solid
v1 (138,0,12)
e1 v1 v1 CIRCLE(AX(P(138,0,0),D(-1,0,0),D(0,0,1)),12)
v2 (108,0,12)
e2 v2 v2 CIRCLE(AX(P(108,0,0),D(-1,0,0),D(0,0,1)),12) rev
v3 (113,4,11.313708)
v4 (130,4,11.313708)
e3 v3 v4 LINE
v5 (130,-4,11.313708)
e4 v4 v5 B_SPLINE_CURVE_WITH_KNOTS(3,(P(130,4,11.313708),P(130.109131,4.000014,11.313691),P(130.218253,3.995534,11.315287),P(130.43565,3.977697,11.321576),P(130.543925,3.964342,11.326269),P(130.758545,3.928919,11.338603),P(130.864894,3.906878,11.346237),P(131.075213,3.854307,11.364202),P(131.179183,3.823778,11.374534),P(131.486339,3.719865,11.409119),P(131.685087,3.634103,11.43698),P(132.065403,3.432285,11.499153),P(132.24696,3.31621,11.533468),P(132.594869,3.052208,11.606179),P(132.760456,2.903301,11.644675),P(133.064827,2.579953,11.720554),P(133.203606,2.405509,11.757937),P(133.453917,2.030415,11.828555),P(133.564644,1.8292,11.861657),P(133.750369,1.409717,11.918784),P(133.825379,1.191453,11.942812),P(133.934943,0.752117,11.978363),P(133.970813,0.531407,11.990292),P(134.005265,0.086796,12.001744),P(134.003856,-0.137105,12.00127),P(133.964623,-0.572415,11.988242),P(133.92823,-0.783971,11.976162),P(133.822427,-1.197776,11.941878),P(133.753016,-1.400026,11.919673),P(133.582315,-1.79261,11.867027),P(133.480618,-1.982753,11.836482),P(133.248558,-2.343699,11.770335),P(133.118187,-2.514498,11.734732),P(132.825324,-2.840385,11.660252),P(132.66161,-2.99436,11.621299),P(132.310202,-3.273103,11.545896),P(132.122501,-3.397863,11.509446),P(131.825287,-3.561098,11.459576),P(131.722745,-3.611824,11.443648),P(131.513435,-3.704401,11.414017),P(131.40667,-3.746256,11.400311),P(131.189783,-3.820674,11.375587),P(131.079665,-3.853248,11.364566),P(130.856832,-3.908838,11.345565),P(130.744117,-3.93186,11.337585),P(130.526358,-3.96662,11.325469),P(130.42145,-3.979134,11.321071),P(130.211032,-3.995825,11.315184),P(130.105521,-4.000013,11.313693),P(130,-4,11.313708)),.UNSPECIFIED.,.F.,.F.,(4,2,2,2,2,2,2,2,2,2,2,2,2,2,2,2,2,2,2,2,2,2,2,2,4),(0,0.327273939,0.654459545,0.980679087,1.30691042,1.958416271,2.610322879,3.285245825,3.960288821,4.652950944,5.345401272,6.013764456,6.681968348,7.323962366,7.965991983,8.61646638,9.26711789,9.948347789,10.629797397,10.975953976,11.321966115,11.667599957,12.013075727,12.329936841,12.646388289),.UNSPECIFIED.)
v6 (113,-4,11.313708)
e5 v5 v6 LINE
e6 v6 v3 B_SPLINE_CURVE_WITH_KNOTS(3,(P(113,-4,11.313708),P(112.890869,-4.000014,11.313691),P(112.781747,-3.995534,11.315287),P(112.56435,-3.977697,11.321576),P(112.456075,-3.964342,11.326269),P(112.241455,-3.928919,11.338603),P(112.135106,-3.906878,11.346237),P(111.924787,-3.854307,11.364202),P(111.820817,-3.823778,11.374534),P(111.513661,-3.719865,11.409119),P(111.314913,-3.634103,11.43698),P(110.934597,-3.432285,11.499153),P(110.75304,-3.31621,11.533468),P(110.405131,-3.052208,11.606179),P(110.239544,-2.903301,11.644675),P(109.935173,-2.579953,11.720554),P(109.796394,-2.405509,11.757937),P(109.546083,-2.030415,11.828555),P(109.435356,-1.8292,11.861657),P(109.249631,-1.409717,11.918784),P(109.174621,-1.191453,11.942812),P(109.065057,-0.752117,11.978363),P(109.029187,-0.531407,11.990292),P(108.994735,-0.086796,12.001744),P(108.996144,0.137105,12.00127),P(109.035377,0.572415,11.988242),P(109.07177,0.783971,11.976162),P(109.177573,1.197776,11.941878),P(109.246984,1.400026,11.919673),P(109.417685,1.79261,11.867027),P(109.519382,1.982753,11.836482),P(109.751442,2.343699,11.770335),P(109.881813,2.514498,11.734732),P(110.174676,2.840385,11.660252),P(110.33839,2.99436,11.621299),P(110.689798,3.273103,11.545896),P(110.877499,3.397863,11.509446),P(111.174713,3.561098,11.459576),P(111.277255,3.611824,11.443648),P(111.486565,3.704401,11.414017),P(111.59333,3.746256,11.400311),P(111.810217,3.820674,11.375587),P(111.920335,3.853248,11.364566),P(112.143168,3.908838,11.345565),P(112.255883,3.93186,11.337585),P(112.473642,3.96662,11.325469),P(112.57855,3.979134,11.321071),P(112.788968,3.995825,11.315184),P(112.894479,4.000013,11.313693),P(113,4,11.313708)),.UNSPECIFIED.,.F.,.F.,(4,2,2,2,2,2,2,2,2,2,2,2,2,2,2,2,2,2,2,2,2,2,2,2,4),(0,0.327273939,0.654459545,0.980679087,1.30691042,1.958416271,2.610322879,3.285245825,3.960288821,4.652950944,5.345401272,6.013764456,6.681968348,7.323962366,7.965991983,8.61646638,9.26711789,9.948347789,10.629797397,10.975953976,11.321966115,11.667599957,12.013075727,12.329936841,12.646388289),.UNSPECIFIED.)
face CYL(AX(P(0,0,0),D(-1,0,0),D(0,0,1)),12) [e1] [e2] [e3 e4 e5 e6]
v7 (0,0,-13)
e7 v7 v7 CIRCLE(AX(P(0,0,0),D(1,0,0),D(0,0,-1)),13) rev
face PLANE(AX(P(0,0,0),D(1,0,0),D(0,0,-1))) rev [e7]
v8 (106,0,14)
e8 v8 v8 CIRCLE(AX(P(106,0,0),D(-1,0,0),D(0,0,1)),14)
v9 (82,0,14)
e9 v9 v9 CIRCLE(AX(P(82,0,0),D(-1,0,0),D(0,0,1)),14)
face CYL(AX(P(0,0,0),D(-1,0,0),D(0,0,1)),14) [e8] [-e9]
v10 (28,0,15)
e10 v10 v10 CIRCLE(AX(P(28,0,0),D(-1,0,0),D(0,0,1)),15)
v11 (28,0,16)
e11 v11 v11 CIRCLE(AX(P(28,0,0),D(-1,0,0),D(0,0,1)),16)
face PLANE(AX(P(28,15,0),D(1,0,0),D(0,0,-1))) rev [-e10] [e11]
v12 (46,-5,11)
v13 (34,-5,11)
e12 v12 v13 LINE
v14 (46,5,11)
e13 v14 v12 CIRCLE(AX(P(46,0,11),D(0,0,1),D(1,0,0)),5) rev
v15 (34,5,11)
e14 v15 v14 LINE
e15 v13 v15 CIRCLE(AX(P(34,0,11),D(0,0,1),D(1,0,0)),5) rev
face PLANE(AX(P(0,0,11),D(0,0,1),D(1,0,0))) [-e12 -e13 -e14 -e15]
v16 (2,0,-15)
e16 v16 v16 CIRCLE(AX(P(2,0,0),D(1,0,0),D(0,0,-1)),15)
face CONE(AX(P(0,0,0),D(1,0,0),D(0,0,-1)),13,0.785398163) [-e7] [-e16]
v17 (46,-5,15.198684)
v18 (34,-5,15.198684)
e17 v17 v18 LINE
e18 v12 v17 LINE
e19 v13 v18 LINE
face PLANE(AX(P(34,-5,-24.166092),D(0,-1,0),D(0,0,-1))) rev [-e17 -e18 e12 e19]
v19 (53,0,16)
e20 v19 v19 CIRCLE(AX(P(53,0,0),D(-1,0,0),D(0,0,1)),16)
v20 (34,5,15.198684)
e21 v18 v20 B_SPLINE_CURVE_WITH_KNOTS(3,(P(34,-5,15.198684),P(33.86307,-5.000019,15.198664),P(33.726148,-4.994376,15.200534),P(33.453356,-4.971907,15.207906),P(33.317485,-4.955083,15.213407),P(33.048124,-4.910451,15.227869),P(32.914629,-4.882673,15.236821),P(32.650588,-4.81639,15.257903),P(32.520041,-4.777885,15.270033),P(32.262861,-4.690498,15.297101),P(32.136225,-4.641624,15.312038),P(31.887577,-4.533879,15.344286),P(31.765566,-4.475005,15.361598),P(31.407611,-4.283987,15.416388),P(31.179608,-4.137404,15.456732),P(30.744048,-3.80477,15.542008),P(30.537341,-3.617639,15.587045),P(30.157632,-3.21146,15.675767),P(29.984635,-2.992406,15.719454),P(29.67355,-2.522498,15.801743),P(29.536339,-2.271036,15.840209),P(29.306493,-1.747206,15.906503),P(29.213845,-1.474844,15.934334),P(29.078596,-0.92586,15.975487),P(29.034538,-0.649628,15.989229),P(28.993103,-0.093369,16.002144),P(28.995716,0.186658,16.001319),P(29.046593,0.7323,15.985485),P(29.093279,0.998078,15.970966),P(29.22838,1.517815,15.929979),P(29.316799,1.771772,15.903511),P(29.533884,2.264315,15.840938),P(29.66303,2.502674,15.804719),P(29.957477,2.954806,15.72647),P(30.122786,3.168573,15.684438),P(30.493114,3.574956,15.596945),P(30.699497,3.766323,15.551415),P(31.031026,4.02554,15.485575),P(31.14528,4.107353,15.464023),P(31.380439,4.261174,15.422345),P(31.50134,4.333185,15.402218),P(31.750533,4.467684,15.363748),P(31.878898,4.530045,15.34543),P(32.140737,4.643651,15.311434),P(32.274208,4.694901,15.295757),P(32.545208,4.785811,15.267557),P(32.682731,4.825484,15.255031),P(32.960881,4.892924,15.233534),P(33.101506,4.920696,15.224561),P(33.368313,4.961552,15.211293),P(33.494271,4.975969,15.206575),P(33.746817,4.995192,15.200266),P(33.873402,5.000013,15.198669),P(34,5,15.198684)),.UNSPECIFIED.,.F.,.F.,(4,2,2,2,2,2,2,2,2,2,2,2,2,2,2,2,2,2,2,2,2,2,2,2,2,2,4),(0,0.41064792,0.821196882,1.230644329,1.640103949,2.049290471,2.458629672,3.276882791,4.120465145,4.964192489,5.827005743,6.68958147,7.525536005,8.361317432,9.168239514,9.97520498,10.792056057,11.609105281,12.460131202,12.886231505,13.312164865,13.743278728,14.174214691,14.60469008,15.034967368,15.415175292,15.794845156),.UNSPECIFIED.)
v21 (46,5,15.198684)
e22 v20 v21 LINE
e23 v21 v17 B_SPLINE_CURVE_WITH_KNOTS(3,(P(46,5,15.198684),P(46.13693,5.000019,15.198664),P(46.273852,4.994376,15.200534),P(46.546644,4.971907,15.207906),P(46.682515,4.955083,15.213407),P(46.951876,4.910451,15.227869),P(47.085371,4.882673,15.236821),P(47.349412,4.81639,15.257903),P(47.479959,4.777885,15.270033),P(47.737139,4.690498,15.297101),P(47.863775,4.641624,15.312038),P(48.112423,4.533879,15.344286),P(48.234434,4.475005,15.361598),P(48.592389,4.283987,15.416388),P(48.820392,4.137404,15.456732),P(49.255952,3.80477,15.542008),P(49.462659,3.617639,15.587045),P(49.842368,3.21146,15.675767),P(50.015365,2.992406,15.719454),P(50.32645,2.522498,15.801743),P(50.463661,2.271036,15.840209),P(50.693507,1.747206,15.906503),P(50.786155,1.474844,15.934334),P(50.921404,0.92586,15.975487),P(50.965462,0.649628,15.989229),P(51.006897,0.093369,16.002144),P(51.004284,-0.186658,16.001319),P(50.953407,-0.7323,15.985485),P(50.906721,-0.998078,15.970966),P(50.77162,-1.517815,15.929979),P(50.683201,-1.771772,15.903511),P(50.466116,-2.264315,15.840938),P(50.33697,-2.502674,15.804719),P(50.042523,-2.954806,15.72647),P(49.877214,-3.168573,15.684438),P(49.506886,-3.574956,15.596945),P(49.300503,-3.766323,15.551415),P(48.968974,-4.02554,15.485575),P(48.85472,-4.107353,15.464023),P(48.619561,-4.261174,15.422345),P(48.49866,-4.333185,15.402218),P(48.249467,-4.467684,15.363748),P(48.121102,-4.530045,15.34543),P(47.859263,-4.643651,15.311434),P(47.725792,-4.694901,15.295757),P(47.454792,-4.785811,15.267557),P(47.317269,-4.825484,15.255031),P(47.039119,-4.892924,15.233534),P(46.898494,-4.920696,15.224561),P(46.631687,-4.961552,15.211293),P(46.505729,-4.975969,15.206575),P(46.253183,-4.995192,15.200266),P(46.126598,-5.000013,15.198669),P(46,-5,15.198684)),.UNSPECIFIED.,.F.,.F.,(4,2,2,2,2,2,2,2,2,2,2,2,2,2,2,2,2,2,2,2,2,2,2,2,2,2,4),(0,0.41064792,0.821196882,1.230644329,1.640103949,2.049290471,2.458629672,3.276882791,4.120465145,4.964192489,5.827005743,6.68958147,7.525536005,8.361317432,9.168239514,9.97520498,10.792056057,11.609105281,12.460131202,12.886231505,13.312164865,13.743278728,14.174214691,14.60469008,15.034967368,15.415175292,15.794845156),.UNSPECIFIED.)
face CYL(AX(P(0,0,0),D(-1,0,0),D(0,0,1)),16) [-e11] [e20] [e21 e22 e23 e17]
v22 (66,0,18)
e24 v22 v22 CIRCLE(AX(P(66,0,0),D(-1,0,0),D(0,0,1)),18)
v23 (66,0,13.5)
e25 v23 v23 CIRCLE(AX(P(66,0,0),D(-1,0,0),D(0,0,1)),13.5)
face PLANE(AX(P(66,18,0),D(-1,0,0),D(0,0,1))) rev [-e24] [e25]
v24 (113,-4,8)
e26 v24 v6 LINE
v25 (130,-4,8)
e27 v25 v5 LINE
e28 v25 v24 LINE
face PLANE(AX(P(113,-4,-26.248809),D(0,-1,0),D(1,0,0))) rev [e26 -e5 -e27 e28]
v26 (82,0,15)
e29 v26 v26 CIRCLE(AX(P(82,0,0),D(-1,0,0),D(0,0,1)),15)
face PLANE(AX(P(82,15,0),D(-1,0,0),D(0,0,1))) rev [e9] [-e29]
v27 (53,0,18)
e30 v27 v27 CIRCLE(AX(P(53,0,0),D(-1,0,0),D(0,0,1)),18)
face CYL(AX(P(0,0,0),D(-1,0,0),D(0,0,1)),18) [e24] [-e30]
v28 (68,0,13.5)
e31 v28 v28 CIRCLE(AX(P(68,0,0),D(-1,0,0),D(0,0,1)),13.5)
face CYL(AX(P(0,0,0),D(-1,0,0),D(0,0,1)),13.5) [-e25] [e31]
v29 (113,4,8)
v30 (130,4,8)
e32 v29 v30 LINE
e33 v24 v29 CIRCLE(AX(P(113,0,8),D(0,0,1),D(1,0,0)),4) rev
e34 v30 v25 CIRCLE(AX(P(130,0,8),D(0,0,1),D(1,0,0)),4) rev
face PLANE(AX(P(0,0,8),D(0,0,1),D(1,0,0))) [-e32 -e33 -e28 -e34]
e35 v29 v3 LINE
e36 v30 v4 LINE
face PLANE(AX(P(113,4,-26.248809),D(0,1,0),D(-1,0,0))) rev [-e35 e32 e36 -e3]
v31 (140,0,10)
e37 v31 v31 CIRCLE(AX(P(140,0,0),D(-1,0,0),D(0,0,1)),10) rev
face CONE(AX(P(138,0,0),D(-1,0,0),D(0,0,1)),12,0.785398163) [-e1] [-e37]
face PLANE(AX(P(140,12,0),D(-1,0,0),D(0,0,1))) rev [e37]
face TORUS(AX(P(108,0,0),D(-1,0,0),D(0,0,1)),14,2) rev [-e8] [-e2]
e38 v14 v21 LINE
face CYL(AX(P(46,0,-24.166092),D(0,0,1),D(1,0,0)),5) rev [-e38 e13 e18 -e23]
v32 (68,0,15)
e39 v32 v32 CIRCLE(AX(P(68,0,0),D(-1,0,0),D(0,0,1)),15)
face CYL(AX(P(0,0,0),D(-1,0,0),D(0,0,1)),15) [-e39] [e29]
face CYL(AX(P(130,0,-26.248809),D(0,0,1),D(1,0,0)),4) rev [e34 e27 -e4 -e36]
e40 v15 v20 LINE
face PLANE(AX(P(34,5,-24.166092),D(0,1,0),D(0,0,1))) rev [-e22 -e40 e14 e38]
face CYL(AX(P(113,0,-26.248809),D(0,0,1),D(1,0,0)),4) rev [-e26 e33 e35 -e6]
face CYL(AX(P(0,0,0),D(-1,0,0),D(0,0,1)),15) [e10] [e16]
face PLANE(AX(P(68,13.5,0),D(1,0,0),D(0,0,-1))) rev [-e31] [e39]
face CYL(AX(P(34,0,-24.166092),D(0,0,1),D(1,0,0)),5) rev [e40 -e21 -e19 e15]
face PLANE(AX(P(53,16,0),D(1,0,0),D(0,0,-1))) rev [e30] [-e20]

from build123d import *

# Parameters (mm, degrees)
CUT_EXTRUDE_1_DEPTH = 12
CUT_EXTRUDE_2_DEPTH = 9
CHAMFER_1_SIZE      = 2
FILLET_1_R          = 2


with BuildPart() as part:
    # 草图1 → 旋转1 (revolve)
    with BuildSketch(Plane.XY, mode=Mode.PRIVATE) as revolve_1_sk:
        Polygon((0, 0), (0, 15), (28, 15), (28, 16), (53, 16), (53, 18), (66, 18), (66, 13.5), (68, 13.5), (68, 15), (82, 15), (82, 14), (106, 14), (106, 12), (140, 12), (140, 0), align=None)
    revolve(revolve_1_sk.sketch.rotate(Axis((0, 0, 0), (1, 0, 0)), 90), axis=Axis((0, 0, 0), (1, 0, 0)))

    # 草图2 → 切除-拉伸1 (cut)
    with BuildSketch(Plane.XY.offset(20)):
        with BuildLine():
            Line((113, 4), (130, 4))
            ThreePointArc((130, 4), (134, 0), (130, -4))
            Line((130, -4), (113, -4))
            ThreePointArc((113, -4), (109, 0), (113, 4))
        make_face()
    extrude(amount=-CUT_EXTRUDE_1_DEPTH, mode=Mode.SUBTRACT)

    # 草图3 → 切除-拉伸2 (cut)
    with BuildSketch(Plane.XY.offset(20)):
        with BuildLine():
            Line((34, 5), (46, 5))
            ThreePointArc((46, 5), (51, 0), (46, -5))
            Line((46, -5), (34, -5))
            ThreePointArc((34, -5), (29, 0), (34, 5))
        make_face()
    extrude(amount=-CUT_EXTRUDE_2_DEPTH, mode=Mode.SUBTRACT)

    # 倒角1
    chamfer_1_edges = [part.edges().sort_by_distance(p)[0] for p in [
        (140, 0, -12),
        (0, 0, -15),
    ]]
    chamfer(chamfer_1_edges, length=CHAMFER_1_SIZE)

    # 圆角1
    fillet_1_edges = [part.edges().sort_by_distance(p)[0] for p in [
        (106, 0, -12),
    ]]
    fillet(fillet_1_edges, radius=FILLET_1_R - 0.0001)  # a hair under: the kernel refuses the full size


solid = part.part
